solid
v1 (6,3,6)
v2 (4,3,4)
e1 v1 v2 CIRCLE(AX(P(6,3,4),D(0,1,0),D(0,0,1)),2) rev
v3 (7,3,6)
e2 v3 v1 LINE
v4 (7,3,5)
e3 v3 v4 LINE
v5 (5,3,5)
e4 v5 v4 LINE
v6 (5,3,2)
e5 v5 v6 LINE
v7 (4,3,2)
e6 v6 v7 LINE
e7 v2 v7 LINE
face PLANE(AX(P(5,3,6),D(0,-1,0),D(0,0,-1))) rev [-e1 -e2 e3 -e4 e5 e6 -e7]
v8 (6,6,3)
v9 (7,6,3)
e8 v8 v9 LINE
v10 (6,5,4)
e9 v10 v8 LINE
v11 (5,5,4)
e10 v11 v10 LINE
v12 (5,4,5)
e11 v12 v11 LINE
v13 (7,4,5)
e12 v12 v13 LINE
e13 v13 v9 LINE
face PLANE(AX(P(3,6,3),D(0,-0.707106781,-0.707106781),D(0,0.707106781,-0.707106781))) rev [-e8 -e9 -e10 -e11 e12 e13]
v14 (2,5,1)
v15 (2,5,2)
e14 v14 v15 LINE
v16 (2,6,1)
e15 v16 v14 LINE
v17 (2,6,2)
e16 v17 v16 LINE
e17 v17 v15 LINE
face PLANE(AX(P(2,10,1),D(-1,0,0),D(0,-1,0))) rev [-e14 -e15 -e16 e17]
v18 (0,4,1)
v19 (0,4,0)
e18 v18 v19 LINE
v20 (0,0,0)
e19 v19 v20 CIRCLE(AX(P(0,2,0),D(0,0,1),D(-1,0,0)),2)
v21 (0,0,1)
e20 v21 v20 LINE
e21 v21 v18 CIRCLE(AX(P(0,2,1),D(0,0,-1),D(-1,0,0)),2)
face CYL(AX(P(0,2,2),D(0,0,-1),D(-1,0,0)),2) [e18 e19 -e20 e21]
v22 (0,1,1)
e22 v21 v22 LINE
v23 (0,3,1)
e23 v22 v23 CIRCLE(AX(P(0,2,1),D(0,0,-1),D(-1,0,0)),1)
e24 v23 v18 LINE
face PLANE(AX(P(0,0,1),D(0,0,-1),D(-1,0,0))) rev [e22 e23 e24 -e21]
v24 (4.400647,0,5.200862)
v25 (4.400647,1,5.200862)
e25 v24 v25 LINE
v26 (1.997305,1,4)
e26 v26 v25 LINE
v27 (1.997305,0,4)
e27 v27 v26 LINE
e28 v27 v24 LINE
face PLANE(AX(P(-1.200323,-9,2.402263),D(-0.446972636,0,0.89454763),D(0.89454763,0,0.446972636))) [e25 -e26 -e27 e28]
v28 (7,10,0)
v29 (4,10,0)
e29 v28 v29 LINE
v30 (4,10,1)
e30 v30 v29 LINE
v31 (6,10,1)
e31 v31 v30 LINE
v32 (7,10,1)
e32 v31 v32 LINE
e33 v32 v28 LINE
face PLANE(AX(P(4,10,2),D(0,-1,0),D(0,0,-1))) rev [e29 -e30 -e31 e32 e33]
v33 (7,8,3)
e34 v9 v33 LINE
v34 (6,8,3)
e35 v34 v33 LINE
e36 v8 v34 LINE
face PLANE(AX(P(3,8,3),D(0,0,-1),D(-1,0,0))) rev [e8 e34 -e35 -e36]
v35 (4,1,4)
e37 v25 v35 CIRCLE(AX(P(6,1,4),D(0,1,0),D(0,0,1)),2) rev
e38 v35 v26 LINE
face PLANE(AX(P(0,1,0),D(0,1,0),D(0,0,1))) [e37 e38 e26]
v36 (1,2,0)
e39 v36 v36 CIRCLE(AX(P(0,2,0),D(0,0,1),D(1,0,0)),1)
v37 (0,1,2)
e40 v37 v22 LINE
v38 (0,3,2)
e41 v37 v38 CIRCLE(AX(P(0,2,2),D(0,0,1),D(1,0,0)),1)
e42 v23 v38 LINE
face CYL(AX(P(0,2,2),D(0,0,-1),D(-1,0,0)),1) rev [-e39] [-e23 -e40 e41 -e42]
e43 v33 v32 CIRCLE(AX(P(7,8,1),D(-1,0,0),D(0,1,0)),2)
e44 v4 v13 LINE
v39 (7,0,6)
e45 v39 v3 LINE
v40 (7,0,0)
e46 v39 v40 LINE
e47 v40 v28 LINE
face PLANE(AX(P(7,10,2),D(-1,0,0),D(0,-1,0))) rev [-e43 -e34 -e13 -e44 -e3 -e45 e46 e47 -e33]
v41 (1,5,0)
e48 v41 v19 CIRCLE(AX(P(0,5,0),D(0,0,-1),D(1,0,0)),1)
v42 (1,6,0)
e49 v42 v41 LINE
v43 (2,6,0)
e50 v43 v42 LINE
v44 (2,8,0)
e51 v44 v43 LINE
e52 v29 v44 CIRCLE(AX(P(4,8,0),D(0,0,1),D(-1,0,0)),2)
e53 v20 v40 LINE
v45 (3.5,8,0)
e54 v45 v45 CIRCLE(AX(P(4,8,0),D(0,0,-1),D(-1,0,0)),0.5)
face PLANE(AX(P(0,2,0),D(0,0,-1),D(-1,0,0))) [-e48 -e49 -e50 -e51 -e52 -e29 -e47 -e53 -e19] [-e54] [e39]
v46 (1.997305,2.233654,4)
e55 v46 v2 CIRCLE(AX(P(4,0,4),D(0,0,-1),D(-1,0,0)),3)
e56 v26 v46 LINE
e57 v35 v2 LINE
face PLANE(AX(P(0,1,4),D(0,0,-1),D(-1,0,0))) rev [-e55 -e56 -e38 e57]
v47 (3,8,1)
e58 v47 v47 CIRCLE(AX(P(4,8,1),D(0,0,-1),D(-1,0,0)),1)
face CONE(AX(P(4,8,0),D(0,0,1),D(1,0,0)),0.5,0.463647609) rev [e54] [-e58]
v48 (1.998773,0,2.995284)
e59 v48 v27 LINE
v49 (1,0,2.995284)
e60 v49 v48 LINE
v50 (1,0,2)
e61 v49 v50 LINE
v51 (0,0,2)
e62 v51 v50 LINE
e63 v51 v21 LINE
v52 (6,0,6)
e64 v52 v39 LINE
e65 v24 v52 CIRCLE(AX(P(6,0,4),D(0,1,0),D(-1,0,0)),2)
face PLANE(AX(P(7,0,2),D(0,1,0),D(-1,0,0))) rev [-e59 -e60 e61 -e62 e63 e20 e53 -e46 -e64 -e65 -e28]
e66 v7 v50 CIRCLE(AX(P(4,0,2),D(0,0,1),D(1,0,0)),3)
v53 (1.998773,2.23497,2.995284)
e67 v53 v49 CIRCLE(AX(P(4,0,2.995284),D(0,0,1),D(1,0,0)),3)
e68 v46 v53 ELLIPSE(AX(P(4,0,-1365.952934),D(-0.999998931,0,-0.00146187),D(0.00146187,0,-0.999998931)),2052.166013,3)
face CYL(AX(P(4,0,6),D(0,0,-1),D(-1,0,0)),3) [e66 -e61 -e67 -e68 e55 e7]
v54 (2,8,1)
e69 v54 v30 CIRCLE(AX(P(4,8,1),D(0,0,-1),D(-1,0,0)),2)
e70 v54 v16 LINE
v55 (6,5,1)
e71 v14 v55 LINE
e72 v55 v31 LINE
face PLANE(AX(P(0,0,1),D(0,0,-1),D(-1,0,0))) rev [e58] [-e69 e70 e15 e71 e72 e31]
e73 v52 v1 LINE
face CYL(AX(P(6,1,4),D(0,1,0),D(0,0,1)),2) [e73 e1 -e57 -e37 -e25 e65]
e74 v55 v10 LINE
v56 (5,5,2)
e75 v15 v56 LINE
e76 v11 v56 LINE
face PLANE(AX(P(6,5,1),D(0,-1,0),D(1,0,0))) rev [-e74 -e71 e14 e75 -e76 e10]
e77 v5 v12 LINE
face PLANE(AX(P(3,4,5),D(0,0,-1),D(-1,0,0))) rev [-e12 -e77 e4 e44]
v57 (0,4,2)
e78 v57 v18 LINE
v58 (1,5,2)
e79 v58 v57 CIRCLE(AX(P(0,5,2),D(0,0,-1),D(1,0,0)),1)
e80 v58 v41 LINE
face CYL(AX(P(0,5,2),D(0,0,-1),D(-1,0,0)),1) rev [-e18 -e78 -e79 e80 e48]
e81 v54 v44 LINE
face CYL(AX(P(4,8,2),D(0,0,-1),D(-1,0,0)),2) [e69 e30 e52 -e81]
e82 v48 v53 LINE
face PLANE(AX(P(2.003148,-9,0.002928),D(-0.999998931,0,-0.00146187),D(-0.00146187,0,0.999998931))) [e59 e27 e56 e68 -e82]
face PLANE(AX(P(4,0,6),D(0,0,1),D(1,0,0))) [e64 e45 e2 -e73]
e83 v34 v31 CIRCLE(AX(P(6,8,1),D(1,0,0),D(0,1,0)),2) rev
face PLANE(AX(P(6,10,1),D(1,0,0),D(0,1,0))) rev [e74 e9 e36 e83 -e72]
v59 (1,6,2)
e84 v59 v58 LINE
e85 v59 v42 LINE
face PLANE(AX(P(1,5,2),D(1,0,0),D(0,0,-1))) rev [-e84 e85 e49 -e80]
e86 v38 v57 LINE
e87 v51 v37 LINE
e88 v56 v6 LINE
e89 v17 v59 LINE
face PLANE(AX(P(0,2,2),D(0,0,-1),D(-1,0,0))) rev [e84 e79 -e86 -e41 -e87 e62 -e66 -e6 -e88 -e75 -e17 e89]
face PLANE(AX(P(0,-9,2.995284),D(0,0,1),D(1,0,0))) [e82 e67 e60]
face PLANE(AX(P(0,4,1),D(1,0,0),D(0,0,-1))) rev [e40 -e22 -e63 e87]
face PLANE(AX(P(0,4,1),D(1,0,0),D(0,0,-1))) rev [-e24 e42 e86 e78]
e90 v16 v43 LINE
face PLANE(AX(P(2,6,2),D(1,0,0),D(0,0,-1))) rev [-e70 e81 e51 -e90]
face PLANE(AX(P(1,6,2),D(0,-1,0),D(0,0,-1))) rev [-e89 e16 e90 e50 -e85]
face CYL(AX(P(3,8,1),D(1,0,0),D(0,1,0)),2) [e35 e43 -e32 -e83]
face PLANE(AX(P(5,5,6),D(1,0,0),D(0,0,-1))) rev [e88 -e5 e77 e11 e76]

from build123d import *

# Parameters (mm, degrees)
SKETCH1_R           = 1
BOSS_EXTRUDE1_DEPTH = 2
SKETCH2_W           = 4
SKETCH2_H           = 5
SKETCH2_W_2         = 2.463434366
SKETCH2_H_2         = 4
CUT_EXTRUDE1_DEPTH  = 1
BOSS_EXTRUDE2_DEPTH = 4
CUT_EXTRUDE2_DEPTH  = 4
CUT_EXTRUDE3_DEPTH  = 2
CUT_EXTRUDE4_START  = -3
CUT_EXTRUDE4_DEPTH  = 2.234970342


with BuildPart() as part:
    # Sketch1 → Boss-Extrude1 (new body)
    with BuildSketch(Plane.XY):
        with BuildLine():
            Line((1, 5), (1, 6))
            Line((1, 6), (2, 6))
            Line((2, 6), (2, 8))
            ThreePointArc((2, 8), (2.585786438, 9.414213562), (4, 10))
            Line((4, 10), (7, 10))
            Line((7, 10), (7, 0))
            Line((7, 0), (0, 0))
            ThreePointArc((0, 0), (-2, 2), (0, 4))
            ThreePointArc((0, 4), (0.707106781, 4.292893219), (1, 5))
        make_face()
        with Locations((0, 2)):
            Circle(SKETCH1_R, mode=Mode.SUBTRACT)
    extrude(amount=BOSS_EXTRUDE1_DEPTH)

    # Sketch2 → Cut-Extrude1 (cut)
    with BuildSketch(Plane.XY.offset(2)):
        with Locations((4, 7.5)):
            Rectangle(SKETCH2_W, SKETCH2_H)
        with Locations((-1.231717183, 2)):
            Rectangle(SKETCH2_W_2, SKETCH2_H_2)
    extrude(amount=-CUT_EXTRUDE1_DEPTH, mode=Mode.SUBTRACT)

    # Sketch3 → Boss-Extrude2 (add)
    with BuildSketch(Plane.XY.offset(2)):
        with BuildLine():
            Line((7, 10), (6, 10))
            Line((6, 10), (6, 5))
            Line((6, 5), (5, 5))
            Line((5, 5), (5, 3))
            Line((5, 3), (4, 3))
            ThreePointArc((4, 3), (1.878679656, 2.121320344), (1, 0))
            Line((1, 0), (7, 0))
            Line((7, 0), (7, 10))
        make_face()
    extrude(amount=BOSS_EXTRUDE2_DEPTH)

    # Sketch4 → Cut-Extrude2 (cut)
    with BuildSketch(Plane(origin=(7, 0, 0), x_dir=(0, 0, -1), z_dir=(1, 0, 0))):
        with BuildLine():
            Line((-3, 8), (-3, 6))
            Line((-3, 6), (-5, 4))
            Line((-5, 4), (-5, 3))
            Line((-5, 3), (-6, 3))
            Line((-6, 3), (-6, 10))
            Line((-6, 10), (-1, 10))
            ThreePointArc((-1, 10), (-2.414213562, 9.414213562), (-3, 8))
        make_face()
    extrude(amount=-CUT_EXTRUDE2_DEPTH, mode=Mode.SUBTRACT)

    # Sketch5 → Cut-Extrude3 (cut)
    with BuildSketch(Plane(origin=(0, 3, 0), x_dir=(1, 0, 0), z_dir=(0, 1, 0))):
        with BuildLine():
            Line((6, -6), (1.997304718, -6))
            Line((1.997304718, -6), (1.997304718, -4))
            Line((1.997304718, -4), (4, -4))
            ThreePointArc((4, -4), (4.585786438, -5.414213562), (6, -6))
        make_face()
    extrude(amount=-CUT_EXTRUDE3_DEPTH, mode=Mode.SUBTRACT)

    # Cut-Extrude4: read off the stored shape, not the designer's step
    # Cut-Extrude4 outline → Cut-Extrude4 (cut)
    with BuildSketch(Plane(origin=(0, 3, 0), x_dir=(1, 0, 0), z_dir=(0, 1, 0)).offset(CUT_EXTRUDE4_START)):
        with BuildLine():
            Line((1.998773483, -2.995283948), (1, -2.995283948))
            Line((1, -2.995283948), (1, -6))
            Line((1, -6), (6, -6))
            ThreePointArc((6, -6), (5.106054728, -5.78909526), (4.400646751, -5.200861851))
            Line((4.400646751, -5.200861851), (1.997304718, -4))
            Line((1.997304718, -4), (1.998773483, -2.995283948))
        make_face()
    extrude(amount=CUT_EXTRUDE4_DEPTH, mode=Mode.SUBTRACT)

    # Sketch8 → Cut-Revolve1 (revolve, cut)
    with BuildSketch(Plane(origin=(4, 0, 0), x_dir=(0, 0, -1), z_dir=(1, 0, 0)), mode=Mode.PRIVATE) as cut_revolve1_sk:
        Polygon((0, 8), (0, 8.5), (-1, 9), (-1, 8), align=None)
    revolve(cut_revolve1_sk.sketch.rotate(Axis((4, 8, -0.711012061), (0, 0, 1)), 90), axis=Axis((4, 8, -0.711012061), (0, 0, 1)), mode=Mode.SUBTRACT)


solid = part.part
